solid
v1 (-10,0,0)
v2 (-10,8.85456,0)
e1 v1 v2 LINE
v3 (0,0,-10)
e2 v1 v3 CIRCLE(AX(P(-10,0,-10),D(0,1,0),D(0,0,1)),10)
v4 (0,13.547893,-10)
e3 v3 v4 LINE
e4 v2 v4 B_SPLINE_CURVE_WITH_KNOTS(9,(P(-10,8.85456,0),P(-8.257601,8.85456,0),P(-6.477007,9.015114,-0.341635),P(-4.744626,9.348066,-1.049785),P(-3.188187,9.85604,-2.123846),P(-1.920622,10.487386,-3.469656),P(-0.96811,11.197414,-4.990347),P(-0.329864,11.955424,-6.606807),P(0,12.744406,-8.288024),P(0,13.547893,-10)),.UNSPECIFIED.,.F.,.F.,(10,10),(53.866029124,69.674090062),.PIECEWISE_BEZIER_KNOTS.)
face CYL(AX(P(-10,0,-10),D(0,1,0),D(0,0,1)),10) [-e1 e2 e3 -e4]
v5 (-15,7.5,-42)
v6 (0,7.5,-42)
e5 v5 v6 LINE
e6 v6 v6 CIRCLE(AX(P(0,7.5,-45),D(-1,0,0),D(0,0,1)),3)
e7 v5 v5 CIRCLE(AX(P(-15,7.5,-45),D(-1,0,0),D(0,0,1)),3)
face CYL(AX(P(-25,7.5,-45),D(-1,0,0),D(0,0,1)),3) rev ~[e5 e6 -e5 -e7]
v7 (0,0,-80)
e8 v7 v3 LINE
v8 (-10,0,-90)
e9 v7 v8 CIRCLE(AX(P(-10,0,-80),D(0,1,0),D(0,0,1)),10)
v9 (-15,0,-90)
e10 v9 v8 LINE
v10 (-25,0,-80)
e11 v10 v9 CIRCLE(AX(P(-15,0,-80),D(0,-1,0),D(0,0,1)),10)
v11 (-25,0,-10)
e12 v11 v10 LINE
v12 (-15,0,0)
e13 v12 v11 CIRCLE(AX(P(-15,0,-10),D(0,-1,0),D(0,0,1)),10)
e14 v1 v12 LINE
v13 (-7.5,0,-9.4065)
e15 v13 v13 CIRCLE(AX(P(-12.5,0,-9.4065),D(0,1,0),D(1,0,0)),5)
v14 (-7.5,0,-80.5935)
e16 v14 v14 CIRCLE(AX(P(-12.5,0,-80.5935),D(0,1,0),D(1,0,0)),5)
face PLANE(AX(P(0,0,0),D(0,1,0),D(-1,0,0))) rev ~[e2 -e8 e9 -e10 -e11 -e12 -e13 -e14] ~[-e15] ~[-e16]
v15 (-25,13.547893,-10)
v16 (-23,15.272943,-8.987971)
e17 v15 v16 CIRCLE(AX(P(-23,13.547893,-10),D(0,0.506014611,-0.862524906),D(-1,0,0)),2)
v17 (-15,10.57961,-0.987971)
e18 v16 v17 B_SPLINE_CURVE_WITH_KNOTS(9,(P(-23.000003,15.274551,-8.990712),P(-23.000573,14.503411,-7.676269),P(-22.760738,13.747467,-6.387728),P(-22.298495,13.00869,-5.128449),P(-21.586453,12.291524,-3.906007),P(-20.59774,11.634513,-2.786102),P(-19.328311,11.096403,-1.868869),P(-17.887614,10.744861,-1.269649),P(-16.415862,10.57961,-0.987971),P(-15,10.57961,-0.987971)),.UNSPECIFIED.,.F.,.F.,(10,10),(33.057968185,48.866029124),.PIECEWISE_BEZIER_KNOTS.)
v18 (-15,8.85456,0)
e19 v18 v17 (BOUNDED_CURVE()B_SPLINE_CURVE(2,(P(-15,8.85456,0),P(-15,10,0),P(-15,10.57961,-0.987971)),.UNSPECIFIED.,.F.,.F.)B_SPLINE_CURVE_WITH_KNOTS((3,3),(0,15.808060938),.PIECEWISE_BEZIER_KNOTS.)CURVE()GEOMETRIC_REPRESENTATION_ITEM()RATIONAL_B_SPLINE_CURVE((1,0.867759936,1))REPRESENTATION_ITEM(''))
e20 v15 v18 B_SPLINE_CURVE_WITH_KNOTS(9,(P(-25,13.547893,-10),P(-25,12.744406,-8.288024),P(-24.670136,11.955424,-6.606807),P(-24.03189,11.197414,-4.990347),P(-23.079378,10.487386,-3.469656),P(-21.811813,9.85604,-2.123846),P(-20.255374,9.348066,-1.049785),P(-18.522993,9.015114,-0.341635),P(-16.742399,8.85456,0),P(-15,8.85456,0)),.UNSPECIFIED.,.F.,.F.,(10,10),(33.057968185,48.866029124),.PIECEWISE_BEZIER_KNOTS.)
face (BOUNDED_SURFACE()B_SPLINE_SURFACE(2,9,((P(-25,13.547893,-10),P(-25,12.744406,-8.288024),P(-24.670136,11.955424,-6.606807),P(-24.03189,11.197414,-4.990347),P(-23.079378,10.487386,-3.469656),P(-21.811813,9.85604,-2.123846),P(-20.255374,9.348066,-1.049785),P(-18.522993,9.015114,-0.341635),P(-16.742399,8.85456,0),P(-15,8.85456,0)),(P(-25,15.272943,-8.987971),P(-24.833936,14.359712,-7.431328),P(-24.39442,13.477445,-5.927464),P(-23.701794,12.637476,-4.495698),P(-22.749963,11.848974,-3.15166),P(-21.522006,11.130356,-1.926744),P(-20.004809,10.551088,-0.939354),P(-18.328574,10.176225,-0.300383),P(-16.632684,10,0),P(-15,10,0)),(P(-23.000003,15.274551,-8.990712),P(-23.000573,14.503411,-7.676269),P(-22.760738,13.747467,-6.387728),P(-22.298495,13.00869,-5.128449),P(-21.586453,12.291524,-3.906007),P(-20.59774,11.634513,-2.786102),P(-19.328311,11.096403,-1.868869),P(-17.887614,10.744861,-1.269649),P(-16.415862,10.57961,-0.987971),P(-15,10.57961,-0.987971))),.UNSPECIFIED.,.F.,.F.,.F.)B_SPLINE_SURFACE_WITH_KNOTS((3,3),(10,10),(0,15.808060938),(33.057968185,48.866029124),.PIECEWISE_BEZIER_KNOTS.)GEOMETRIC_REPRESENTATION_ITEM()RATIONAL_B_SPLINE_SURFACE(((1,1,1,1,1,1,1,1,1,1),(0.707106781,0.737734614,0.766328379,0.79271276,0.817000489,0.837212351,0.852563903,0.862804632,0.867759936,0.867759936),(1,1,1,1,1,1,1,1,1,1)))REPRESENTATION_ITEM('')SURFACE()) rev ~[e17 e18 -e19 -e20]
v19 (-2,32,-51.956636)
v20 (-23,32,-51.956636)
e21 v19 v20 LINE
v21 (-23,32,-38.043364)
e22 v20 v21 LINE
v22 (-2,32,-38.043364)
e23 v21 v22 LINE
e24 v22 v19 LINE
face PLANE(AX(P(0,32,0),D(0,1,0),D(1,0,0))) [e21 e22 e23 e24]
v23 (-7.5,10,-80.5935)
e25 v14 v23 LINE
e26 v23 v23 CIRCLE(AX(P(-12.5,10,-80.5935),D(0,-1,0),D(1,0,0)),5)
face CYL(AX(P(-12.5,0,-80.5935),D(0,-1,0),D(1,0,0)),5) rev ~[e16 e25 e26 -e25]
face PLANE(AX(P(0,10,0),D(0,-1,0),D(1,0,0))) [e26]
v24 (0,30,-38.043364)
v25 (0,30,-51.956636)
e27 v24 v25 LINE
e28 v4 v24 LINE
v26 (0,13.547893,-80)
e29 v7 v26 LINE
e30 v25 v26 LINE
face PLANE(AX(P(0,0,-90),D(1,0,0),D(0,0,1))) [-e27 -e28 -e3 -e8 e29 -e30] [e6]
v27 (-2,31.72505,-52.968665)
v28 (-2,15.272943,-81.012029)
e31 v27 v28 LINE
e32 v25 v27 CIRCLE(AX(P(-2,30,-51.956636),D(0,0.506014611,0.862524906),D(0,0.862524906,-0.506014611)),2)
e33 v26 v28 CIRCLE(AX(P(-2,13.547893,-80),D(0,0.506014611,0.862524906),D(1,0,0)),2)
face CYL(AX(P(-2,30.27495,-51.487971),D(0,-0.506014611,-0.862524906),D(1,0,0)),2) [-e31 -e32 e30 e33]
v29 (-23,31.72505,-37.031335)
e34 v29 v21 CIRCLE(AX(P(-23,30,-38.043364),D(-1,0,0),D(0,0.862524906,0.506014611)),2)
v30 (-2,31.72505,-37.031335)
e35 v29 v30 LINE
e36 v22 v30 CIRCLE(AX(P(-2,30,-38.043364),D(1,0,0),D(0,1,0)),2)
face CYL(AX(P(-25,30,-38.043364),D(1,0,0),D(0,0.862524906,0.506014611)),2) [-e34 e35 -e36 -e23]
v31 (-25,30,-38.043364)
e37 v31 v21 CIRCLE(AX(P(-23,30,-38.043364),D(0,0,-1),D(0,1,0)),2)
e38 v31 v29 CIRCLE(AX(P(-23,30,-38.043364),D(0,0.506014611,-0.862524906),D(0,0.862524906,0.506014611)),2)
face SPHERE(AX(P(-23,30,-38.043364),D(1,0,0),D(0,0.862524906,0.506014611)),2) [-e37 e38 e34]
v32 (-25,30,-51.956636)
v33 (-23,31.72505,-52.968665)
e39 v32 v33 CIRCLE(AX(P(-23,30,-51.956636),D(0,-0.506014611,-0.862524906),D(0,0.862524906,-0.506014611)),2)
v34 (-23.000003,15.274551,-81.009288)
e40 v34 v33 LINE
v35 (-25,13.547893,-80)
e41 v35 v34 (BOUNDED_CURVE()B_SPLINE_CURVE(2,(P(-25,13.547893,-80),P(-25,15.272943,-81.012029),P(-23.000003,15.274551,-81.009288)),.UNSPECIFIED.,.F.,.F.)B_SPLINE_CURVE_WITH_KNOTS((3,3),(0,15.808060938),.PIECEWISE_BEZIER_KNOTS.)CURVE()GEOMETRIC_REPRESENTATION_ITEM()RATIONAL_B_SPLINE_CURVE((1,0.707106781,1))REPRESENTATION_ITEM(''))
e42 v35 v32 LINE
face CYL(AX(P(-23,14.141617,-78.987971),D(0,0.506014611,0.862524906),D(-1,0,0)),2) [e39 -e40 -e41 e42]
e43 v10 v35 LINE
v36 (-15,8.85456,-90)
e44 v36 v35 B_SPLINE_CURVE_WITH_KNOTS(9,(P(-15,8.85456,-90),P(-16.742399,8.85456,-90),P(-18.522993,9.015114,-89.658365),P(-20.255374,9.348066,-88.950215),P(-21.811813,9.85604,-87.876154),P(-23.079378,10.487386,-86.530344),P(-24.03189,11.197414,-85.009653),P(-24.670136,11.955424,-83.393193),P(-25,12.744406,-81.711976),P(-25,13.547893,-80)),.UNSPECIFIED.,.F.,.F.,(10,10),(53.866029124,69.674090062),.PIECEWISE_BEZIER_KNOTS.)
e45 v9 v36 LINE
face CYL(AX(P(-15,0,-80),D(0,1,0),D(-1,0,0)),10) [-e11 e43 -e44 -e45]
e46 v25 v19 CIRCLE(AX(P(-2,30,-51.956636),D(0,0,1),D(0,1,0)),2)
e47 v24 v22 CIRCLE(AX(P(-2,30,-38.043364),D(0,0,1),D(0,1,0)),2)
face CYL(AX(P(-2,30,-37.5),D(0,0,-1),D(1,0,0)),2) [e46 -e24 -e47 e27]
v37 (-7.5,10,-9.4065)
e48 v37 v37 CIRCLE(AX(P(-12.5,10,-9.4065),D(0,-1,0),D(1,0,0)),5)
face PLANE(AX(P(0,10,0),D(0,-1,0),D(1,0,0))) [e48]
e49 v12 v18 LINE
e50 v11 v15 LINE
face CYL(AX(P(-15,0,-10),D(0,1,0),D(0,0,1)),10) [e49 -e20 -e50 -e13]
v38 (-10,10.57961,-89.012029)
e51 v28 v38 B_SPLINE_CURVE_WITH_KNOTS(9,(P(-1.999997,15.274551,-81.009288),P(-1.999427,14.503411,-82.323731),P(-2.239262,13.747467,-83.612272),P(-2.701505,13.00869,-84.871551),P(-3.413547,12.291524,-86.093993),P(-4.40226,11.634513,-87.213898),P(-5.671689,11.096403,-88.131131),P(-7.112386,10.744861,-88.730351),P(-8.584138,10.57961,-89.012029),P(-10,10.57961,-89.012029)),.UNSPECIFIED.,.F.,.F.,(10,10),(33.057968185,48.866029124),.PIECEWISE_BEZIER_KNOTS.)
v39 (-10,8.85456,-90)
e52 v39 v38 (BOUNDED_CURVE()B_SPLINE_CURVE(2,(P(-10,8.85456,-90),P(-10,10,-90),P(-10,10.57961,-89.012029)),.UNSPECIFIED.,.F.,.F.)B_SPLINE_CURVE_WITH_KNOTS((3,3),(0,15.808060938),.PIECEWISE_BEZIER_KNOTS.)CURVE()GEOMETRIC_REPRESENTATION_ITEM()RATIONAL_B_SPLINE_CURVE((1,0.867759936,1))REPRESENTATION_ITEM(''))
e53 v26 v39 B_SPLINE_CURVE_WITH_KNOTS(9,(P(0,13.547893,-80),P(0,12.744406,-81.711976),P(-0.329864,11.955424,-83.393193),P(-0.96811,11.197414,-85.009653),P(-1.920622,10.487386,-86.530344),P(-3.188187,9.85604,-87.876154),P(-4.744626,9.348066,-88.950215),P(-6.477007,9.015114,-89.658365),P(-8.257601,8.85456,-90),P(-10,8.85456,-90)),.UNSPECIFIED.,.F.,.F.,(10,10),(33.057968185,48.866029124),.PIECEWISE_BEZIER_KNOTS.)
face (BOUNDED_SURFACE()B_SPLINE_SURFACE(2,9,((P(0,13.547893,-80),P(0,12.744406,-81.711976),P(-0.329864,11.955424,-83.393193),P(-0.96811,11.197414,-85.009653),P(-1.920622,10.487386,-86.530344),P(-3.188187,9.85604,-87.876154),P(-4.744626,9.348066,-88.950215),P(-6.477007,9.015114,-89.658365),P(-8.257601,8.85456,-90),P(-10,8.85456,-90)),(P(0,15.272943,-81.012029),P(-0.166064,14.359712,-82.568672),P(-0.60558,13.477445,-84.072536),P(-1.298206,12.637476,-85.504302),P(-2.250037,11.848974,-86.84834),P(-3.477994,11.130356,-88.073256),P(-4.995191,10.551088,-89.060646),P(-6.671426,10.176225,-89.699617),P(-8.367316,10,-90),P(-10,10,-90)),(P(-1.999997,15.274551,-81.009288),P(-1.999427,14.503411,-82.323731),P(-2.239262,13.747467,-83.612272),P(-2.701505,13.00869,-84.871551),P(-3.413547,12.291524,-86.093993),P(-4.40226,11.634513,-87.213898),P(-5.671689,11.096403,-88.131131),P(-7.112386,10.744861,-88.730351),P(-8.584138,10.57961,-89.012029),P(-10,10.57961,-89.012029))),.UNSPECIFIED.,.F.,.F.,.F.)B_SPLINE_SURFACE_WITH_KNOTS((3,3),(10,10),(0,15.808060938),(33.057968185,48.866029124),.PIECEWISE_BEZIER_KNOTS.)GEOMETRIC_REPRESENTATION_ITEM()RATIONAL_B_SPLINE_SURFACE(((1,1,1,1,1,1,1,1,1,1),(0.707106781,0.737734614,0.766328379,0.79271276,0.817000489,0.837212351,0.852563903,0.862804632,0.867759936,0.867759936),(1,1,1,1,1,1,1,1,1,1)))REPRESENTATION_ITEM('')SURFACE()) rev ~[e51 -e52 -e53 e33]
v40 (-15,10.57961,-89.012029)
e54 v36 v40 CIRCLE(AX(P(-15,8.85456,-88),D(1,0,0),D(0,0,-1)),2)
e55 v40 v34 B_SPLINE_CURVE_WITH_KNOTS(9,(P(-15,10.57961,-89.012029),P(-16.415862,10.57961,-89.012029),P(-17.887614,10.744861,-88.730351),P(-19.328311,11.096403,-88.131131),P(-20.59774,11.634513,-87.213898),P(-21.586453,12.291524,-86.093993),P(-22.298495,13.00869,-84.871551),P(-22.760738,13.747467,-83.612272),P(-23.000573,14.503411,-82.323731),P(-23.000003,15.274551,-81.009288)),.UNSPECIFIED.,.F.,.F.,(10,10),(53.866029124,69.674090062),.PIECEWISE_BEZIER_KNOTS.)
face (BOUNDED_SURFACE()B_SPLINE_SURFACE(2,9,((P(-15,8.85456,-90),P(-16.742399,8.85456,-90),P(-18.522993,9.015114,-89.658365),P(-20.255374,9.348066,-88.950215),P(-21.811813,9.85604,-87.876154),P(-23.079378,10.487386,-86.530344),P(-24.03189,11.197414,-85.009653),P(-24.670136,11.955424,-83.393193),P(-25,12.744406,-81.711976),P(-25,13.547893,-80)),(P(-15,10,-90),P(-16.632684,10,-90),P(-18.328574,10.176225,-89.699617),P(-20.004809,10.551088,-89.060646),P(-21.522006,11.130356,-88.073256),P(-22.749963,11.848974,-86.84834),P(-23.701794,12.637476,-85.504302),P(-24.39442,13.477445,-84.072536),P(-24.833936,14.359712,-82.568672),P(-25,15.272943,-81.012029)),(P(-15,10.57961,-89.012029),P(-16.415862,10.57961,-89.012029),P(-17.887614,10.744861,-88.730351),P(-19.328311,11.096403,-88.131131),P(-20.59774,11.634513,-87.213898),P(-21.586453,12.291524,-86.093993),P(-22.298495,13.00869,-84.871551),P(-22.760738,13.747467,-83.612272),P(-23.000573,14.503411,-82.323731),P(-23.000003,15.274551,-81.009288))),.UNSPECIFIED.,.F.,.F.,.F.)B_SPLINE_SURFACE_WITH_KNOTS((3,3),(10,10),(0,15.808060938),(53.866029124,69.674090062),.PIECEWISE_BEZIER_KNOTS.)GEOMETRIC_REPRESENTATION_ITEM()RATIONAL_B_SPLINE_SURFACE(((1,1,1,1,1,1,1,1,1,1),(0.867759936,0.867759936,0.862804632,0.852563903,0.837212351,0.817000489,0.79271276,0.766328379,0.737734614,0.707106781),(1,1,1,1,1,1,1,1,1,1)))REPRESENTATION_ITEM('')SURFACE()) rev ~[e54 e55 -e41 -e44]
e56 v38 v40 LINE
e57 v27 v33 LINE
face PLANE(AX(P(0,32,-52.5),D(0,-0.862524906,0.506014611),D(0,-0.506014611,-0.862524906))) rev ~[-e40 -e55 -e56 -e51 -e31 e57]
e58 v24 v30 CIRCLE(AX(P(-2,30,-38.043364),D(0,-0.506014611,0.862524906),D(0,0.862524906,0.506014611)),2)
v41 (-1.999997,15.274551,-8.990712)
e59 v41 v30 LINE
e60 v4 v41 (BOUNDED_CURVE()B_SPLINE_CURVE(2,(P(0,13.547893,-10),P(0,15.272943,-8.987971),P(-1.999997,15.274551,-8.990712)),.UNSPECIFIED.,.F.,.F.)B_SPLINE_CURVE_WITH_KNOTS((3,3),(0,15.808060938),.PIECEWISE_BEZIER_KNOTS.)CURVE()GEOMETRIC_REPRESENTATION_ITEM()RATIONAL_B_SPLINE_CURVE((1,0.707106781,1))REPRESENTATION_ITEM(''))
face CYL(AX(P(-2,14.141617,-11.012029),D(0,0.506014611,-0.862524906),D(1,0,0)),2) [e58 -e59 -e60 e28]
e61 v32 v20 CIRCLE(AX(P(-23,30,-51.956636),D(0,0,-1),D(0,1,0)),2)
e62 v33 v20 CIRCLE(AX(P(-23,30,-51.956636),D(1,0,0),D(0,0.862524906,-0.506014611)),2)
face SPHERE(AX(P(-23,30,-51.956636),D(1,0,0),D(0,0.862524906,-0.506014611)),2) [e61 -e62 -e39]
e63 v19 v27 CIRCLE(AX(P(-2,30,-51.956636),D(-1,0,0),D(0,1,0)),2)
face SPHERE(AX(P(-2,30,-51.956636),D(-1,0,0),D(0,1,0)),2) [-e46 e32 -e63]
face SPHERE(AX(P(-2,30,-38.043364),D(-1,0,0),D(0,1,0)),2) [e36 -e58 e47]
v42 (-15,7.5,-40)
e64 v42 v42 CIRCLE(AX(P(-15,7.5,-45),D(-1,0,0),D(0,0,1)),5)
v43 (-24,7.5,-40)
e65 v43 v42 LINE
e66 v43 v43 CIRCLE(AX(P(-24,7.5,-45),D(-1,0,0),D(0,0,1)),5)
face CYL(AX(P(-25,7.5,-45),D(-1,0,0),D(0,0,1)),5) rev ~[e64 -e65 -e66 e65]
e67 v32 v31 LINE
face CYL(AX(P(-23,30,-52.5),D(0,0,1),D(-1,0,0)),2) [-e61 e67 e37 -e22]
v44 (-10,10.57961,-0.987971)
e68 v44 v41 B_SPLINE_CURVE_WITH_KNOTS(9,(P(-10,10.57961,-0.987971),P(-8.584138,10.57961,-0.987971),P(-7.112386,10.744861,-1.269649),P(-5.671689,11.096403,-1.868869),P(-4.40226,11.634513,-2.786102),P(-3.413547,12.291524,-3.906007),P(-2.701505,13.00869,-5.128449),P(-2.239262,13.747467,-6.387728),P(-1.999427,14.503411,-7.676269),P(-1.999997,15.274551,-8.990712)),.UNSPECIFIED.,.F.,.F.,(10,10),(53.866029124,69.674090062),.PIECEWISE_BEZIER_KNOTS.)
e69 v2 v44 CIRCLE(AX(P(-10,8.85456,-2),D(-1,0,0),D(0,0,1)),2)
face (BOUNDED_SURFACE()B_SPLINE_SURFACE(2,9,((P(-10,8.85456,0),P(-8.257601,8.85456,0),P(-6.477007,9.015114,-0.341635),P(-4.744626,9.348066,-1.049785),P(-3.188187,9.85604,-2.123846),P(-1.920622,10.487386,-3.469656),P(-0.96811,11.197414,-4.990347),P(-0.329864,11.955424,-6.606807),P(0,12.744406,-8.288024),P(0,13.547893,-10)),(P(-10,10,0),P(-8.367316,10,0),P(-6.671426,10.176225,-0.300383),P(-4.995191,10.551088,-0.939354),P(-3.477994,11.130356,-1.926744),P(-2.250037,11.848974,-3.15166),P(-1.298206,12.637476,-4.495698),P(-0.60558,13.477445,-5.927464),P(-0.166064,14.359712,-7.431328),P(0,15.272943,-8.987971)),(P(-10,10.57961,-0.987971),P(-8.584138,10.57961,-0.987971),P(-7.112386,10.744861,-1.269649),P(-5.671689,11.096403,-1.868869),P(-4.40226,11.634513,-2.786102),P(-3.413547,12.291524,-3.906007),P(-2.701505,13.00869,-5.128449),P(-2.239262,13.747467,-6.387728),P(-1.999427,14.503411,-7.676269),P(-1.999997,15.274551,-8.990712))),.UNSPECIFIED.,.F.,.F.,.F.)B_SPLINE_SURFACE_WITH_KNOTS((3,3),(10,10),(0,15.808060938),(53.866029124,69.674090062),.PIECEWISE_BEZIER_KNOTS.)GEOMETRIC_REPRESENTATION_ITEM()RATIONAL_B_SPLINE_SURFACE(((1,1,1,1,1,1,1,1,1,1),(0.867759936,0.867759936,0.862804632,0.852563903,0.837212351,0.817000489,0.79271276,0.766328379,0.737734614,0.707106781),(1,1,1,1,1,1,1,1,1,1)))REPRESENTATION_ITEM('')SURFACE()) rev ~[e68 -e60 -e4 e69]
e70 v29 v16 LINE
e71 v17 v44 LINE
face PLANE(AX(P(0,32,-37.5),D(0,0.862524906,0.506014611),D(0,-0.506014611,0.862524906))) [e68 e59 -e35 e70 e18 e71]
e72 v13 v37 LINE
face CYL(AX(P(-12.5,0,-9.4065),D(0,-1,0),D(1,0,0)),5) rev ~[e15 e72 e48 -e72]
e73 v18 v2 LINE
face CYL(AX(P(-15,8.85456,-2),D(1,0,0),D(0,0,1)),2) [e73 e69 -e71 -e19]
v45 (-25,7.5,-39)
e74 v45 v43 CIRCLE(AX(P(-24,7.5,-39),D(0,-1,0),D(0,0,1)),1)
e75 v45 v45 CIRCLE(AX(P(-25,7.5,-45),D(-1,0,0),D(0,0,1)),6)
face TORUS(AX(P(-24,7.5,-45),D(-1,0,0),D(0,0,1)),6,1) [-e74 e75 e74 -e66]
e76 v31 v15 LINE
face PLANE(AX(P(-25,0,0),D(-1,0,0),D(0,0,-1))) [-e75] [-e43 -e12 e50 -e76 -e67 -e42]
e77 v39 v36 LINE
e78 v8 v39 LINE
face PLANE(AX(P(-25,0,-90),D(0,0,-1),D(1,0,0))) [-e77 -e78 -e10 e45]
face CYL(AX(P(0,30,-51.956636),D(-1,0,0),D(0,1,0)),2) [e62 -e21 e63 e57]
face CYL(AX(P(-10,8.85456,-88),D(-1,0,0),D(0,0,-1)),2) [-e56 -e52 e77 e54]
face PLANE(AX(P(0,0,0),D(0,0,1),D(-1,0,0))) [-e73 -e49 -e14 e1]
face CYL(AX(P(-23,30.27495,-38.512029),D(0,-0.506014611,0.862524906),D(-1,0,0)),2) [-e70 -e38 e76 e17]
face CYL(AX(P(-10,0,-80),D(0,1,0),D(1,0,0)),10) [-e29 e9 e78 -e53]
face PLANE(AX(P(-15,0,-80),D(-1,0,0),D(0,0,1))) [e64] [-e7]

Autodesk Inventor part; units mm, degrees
ref_plane "YZ Plane" through (0, 0, 0) normal (1, 0, 0) x (0, 1, 0)
ref_plane "XZ Plane" through (0, 0, 0) normal (0, 1, 0) x (-1, 0, 0)
ref_plane "XY Plane" through (0, 0, 0) normal (0, 0, 1) x (1, 0, 0)
sketch "Sketch1" plane through (0, 0, 0) normal (0, 1, 0) x (-1, 0, 0)
  line L0 (0, 0) -> (25, 0)
  line L1 (25, 0) -> (25, -90)
  line L2 (25, -90) -> (0, -90)
  line L3 (0, -90) -> (0, 0)
  dimension "d0" = 25
  dimension "d1" = 90
extrude "Extrusion1" add sketch "Sketch1" along normal blind 10
sketch "Sketch2" plane through (0, 10, 0) normal (0, 1, 0) x (1, 0, 0)
  line L0 (-25, 90) -> (-25, 0) projected
  line L1 (0, 0) -> (0, 90) projected
  line L2 (-25, 37.5) -> (0, 37.5)
  line L3 (0, 37.5) -> (0, 52.5)
  line L4 (0, 52.5) -> (-25, 52.5)
  line L5 (-25, 52.5) -> (-25, 37.5)
  line L6 (-25, 0) -> (0, 0) projected
  point P0 (-25, 80)
  point P1 (-25, 10)
  point P2 (0, 10)
  point P3 (0, 80)
  point P4 (-15, 0)
  point P5 (-10, 0)
  point P6 (0, 37.5)
  dimension "d5" = 15
  dimension "d6" = 37.5
extrude "Extrusion2" add sketch "Sketch2" along normal blind 22 contours L4 L1 L2 L0
sketch "Sketch3" plane through (-25, 10, -37.5) normal (0, 0, 1) x (1, 0, 0)
  point P0 (25, -10)
sketch "Sketch5" plane through (0, 0, 0) normal (1, 0, 0) x (0, 0, -1)
  line L0 (37.5, 10) -> (37.5, 32) projected
  line L1 (0, 10) -> (37.5, 10) projected
  line L2 (37.5, 32) -> (0, 10)
  line L3 (37.5, 32) -> (52.5, 32) projected
  line L4 (52.5, 32) -> (90, 10)
  line L5 (90, 10) -> (52.5, 10) projected
  line L6 (52.5, 10) -> (90, 10)
  line L7 (52.5, 10) -> (52.5, 32) projected
  line L8 (52.5, 32) -> (52.5, 10)
  point P0 (0, 0)
extrude "Extrusion3" add sketch "Sketch5" against normal blind 25
fillet "Fillet2" radius 10 4 edges at (-25, 5, 0) (0, 5, 0) (-25, 5, -90) (0, 5, -90)
fillet "Fillet3" radius 2 14 edges at (-12.5, 32, -52.5) (-12.5, 32, -37.5) (0, 32, -45) (-2.9289, 11.7183, -87.0711) (-12.5, 10, -90) (-22.0711, 11.7183, -87.0711) (-25, 23.9333, -66.25) (0, 23.9333, -66.25) (-2.9289, 11.7183, -2.9289) (-12.5, 10, 0) (-22.0711, 11.7183, -2.9289) (-25, 23.9333, -23.75) (0, 23.9333, -23.75) (-25, 32, -45)
sketch "Sketch6" plane through (-25, 0, -80) normal (-1, 0, 0) x (0, 0, 1)
  line L0 (28.0434, 30) -> (41.9566, 30) projected
  line L1 (35, 30) -> (35, 15)
  line L2 (70, 0) -> (0, 0) projected
  line L3 (35, 30) -> (35, 0)
  line L4 (35, 15) -> (35, 0)
  circle A0 centre (35, 7.5) radius 3
  point P0 (80, 0)
  point P1 (35, 22.5)
  dimension "d13" = 6
  dimension "d14" = 7.5
extrude "Extrusion4" cut sketch "Sketch6" against normal blind 25
sketch "Sketch7" plane through (-25, 0, -80) normal (-1, 0, 0) x (0, 0, 1)
  line L0 (35, 25.5581) -> (35, 19.5581)
  circle A0 centre (35, 7.5) radius 3 projected
  line L1 (35, 10.5) -> (35, 4.5)
  circle A1 centre (35, 7.5) radius 5
  point P0 (80, 0)
  point P1 (35, 22.5581)
  dimension "d19" = 10
extrude "Extrusion5" cut sketch "Sketch7" against normal blind 10
fillet "Fillet4" radius 1 1 edges at (-25, 7.5, -50)
sketch "Sketch8" plane through (0, 0, 0) normal (0, -1, 0) x (1, 0, 0)
  line L0 (-10, -90) -> (-15, -90) projected
  line L1 (-12.5, -90) -> (-12.5, 0)
  line L2 (-15, 0) -> (-10, 0) projected
  circle A0 centre (-12.5, -80.5935) radius 5
  circle A1 centre (-12.5, -9.4065) radius 5
  point P0 (0, 0)
  point P1 (-12.5, -45)
  point P2 (-12.5, -4.4065)
  point P3 (-12.5, -14.4065)
  point P4 (-12.5, -75.5935)
  point P5 (-12.5, -85.5935)
  dimension "d23" = 71.187
  dimension "d24" = 10
  dimension "d25" = 10
  dimension "d26" = 35.5935
extrude "Extrusion6" cut sketch "Sketch8" against normal blind 10
properties part number "Triangle_Bracket"
